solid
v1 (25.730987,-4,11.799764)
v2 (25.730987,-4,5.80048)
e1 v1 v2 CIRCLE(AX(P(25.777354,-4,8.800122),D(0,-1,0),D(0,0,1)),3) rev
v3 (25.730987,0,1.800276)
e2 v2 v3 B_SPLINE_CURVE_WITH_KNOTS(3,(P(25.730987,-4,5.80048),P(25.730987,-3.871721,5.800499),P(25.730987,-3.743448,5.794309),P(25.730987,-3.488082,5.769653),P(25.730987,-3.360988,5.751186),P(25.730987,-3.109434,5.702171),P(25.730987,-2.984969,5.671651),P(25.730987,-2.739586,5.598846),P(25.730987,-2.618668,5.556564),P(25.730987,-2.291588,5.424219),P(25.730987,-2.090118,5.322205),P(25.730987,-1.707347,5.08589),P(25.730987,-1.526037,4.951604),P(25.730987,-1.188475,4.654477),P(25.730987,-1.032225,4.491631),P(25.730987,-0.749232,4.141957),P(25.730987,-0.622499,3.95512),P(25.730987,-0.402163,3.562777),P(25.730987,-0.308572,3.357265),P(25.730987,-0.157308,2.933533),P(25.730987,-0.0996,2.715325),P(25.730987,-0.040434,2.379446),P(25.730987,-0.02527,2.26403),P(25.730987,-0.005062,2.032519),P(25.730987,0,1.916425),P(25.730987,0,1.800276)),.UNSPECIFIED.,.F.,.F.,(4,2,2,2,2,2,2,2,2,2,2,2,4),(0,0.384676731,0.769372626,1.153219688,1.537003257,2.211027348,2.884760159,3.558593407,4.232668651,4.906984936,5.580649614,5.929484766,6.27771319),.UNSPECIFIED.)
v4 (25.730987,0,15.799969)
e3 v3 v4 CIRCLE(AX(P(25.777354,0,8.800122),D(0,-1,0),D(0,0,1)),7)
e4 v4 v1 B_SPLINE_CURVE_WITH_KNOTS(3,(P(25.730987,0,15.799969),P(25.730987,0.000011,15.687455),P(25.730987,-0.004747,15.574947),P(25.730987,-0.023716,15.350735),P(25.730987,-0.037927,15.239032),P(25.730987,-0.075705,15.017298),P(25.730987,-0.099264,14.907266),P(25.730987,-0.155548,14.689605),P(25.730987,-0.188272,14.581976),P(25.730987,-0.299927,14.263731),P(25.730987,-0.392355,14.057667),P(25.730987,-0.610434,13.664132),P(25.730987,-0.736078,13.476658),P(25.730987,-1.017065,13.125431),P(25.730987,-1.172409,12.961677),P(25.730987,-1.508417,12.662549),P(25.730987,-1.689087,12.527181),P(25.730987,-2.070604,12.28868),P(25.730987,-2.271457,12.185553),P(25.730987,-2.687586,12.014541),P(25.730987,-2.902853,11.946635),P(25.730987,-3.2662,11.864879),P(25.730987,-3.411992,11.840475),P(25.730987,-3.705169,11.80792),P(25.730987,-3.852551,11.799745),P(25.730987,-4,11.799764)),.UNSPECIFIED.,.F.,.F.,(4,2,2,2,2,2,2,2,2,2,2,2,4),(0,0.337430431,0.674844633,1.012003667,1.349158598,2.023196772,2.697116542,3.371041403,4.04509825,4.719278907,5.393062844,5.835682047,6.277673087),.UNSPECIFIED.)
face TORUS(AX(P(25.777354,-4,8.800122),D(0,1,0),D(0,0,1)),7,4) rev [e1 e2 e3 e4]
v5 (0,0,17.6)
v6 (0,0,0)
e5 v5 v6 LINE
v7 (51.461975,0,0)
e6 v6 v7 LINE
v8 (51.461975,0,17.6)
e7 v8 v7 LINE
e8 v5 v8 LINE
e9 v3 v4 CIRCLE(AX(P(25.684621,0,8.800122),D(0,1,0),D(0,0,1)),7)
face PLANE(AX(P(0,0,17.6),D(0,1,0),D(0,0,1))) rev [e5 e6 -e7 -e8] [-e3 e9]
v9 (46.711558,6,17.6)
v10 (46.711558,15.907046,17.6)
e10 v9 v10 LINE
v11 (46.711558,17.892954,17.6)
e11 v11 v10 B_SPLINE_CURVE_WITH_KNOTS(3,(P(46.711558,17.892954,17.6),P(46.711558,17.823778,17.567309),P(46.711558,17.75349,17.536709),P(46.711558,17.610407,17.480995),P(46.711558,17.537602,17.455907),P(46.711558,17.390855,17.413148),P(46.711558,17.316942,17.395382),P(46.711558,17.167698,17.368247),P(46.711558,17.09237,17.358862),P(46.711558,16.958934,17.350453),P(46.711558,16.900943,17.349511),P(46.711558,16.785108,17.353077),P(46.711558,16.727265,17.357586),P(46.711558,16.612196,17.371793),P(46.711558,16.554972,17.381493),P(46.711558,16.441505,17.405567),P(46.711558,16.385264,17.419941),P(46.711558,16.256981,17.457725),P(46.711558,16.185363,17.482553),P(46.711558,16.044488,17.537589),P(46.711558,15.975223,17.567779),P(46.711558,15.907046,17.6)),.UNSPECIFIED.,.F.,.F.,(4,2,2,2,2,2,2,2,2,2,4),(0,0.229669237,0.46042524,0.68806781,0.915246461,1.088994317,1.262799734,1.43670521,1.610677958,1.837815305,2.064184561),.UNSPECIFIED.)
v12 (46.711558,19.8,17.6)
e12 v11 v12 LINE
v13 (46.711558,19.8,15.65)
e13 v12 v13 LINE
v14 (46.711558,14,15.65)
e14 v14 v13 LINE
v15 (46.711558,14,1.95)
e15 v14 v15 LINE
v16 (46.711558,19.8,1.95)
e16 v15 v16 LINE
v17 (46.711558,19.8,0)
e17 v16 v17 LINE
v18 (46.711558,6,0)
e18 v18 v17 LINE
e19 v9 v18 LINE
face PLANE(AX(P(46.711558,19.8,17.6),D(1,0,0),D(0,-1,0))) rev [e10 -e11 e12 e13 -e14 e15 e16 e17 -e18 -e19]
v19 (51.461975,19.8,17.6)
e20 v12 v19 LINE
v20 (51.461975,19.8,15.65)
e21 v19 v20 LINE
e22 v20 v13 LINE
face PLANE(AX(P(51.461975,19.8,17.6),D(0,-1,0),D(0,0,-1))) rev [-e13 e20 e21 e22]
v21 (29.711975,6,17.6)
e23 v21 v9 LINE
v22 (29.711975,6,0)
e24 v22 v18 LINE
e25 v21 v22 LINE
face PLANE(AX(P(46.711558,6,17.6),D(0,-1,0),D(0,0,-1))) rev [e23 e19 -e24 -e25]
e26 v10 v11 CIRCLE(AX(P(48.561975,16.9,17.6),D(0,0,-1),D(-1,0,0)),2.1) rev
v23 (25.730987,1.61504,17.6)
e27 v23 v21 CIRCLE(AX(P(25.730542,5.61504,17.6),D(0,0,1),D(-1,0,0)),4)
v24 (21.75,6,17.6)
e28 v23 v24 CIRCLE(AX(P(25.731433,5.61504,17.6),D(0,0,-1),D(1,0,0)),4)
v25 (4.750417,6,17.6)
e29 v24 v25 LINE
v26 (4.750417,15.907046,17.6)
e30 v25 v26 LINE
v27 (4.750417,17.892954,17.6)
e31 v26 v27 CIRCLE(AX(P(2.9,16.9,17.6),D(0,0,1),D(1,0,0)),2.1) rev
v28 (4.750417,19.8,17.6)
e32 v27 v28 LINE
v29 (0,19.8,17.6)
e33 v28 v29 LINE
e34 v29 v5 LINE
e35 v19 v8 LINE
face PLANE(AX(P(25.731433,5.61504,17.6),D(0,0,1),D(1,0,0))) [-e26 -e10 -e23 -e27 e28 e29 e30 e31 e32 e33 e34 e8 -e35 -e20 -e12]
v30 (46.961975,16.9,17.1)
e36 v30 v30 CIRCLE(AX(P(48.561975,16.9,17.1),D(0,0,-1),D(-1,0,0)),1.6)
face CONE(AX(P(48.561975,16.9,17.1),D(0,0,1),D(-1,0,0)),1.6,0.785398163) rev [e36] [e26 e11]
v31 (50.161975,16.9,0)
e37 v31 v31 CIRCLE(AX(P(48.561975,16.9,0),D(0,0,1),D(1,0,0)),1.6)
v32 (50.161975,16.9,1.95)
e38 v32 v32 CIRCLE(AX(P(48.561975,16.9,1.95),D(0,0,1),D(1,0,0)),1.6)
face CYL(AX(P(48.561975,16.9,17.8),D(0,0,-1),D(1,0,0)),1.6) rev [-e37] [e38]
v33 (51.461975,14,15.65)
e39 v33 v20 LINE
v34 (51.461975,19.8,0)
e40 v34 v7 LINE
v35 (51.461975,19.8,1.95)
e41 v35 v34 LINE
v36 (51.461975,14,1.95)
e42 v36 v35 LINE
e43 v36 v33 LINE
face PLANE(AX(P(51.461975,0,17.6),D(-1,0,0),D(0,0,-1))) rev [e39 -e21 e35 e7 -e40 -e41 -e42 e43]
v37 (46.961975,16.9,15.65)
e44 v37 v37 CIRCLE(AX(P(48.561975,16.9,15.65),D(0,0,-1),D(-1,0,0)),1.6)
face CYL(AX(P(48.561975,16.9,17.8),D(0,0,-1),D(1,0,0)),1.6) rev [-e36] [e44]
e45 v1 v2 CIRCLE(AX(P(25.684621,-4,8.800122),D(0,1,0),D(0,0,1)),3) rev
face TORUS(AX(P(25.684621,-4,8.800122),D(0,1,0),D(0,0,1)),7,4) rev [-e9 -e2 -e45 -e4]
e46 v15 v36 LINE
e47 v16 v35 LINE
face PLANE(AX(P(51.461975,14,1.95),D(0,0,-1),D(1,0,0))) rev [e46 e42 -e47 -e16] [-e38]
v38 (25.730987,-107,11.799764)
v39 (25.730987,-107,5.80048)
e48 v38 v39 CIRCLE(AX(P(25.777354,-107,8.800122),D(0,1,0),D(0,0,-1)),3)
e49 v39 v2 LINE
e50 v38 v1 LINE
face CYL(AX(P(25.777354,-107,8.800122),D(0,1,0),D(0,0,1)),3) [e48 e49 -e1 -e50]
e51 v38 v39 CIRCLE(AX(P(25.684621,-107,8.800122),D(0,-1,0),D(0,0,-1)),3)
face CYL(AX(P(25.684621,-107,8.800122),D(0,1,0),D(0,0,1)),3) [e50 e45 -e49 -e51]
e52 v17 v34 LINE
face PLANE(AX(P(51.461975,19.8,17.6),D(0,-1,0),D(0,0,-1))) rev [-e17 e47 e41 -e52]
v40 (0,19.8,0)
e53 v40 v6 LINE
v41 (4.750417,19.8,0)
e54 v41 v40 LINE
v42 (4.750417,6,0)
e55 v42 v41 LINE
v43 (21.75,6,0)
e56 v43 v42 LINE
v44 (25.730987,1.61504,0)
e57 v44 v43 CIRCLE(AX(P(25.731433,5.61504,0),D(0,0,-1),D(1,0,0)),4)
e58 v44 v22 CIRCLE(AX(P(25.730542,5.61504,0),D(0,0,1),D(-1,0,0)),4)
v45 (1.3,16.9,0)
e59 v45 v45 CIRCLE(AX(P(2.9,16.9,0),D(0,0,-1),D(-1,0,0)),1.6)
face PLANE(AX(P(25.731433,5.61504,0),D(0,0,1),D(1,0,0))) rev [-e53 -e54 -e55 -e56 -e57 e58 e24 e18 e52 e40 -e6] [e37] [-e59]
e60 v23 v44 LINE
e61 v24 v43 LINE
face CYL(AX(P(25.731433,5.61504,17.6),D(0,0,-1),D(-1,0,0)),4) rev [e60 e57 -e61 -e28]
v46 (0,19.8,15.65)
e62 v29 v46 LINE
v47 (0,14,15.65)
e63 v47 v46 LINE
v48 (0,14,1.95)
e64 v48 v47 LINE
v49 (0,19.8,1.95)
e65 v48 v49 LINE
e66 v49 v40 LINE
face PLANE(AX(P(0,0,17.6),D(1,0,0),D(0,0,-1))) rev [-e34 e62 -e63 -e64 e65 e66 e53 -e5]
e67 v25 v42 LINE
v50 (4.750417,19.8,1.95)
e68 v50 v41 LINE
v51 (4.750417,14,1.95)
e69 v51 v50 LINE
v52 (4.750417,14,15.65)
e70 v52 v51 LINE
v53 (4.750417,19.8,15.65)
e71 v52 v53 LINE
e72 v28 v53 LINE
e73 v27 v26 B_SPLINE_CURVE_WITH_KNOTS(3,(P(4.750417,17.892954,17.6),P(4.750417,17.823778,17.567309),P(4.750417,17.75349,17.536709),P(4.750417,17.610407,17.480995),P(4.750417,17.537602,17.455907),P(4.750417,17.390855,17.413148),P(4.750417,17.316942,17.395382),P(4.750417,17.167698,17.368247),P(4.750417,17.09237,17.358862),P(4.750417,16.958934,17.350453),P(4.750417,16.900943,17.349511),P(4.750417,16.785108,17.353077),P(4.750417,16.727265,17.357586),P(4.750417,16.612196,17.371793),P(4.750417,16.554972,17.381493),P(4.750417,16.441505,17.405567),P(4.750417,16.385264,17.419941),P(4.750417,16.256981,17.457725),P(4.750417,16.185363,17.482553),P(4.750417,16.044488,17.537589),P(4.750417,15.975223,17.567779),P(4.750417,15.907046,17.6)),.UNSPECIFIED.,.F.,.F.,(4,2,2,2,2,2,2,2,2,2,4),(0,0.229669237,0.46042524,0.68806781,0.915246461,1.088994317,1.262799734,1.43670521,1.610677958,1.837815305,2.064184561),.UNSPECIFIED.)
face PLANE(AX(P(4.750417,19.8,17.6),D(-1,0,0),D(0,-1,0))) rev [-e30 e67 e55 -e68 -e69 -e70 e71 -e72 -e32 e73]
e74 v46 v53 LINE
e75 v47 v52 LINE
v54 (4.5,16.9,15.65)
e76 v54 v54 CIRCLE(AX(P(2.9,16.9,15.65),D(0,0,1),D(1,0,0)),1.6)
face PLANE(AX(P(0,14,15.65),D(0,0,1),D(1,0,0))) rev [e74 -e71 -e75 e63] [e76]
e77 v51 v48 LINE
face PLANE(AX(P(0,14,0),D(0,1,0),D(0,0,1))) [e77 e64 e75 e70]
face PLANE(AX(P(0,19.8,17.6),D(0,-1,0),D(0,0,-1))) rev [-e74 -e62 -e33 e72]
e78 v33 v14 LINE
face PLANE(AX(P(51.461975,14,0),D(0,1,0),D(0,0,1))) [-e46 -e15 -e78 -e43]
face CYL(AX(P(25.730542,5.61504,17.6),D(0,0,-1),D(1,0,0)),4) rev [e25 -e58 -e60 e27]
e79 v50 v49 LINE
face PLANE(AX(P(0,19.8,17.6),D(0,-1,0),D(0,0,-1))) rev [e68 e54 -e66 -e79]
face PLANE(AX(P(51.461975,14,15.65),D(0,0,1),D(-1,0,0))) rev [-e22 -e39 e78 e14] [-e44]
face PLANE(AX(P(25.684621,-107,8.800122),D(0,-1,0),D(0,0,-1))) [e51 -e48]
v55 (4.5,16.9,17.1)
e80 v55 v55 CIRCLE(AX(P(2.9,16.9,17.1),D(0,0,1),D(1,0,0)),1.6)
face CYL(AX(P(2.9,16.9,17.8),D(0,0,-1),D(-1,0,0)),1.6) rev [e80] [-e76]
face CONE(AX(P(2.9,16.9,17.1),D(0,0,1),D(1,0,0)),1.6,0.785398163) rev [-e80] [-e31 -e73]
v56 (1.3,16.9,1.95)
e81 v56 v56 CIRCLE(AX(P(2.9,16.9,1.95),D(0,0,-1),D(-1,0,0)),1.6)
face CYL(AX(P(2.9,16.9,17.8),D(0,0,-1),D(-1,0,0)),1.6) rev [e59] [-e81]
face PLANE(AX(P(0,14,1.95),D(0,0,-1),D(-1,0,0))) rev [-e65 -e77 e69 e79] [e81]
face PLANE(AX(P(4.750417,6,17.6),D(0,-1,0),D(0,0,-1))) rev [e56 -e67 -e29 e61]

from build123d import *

# Parameters (mm, degrees)
BOSS_EXTRUDE1_DEPTH = 17.6
SKETCH4_W           = 4.750417
SKETCH4_H           = 13.7
CUT_EXTRUDE1_DEPTH  = 5.8
SKETCH5_R           = 1.6
CUT_EXTRUDE2_DEPTH  = 17.8
BOSS_EXTRUDE2_DEPTH = 107
FILLET1_R           = 4
CHAMFER1_SIZE       = 0.5


with BuildPart() as part:
    # Sketch3 → Boss-Extrude1 (new body)
    with BuildSketch(Plane.XY):
        with BuildLine():
            Line((0, 0), (0, 19.8))
            Line((0, 19.8), (4.750417, 19.8))
            Line((4.750417, 19.8), (4.750417, 6))
            Line((4.750417, 6), (21.75, 6))
            ThreePointArc((21.75, 6), (22.769877953, 2.926324181), (25.730987279, 1.615040214))
            Line((25.730987279, 1.615040214), (25.730987279, 0))
            Line((25.730987279, 0), (0, 0))
        make_face()
    extrude(amount=BOSS_EXTRUDE1_DEPTH)

    # Sketch4 → Cut-Extrude1 (cut)
    with BuildSketch(Plane(origin=(0, 19.8, 0), x_dir=(1, 0, 0), z_dir=(0, 1, 0))):
        with Locations((2.3752085, -8.8)):
            Rectangle(SKETCH4_W, SKETCH4_H)
    extrude(amount=-CUT_EXTRUDE1_DEPTH, mode=Mode.SUBTRACT)

    # Sketch5 → Cut-Extrude2 (cut)
    with BuildSketch(Plane(origin=(0, 0, 0), x_dir=(-1, 0, 0), z_dir=(0, 0, -1))):
        with Locations(Location((-2.9, 16.9, 0), (0, 0, 180))):
            Circle(SKETCH5_R)
    extrude(amount=-CUT_EXTRUDE2_DEPTH, mode=Mode.SUBTRACT)

    # Sketch6 → Boss-Extrude2 (add)
    with BuildSketch(Plane.XZ):
        with BuildLine():
            Line((25.730987279, 11.799763823), (25.730987279, 5.800480479))
            ThreePointArc((25.730987279, 5.800480479), (22.684620888, 8.800122151), (25.730987279, 11.799763823))
        make_face()
    extrude(amount=BOSS_EXTRUDE2_DEPTH)

    # Fillet1
    fillet1_edges = [part.edges().sort_by_distance(p)[0] for p in [
        (22.684620888, 0, 8.800122151),
    ]]
    fillet(fillet1_edges, radius=FILLET1_R)

    # Chamfer1
    # the kernel refuses this chamfer: 0.5 mm, written as the material it takes off along each edge
    with BuildSketch(Plane(origin=(2.9, 16.9, 17.6), x_dir=(1, 0, 0), z_dir=(0, 1, 0))) as chamfer1_piece_1:
        Polygon((1.6 + CHAMFER1_SIZE, 0), (1.6, CHAMFER1_SIZE), (1.6, 0), align=None)
    revolve(axis=Axis((2.9, 16.9, 17.6), (0, 0, -1)), mode=Mode.SUBTRACT)

    # Mirror4: part across plane


with BuildPart() as part_1:
    add(part.part)
    add(part.part.mirror(Plane(origin=(25.730987279, 0, 17.6), x_dir=(0, 0, 1), z_dir=(-1, 0, 0))))


solid = part_1.part
